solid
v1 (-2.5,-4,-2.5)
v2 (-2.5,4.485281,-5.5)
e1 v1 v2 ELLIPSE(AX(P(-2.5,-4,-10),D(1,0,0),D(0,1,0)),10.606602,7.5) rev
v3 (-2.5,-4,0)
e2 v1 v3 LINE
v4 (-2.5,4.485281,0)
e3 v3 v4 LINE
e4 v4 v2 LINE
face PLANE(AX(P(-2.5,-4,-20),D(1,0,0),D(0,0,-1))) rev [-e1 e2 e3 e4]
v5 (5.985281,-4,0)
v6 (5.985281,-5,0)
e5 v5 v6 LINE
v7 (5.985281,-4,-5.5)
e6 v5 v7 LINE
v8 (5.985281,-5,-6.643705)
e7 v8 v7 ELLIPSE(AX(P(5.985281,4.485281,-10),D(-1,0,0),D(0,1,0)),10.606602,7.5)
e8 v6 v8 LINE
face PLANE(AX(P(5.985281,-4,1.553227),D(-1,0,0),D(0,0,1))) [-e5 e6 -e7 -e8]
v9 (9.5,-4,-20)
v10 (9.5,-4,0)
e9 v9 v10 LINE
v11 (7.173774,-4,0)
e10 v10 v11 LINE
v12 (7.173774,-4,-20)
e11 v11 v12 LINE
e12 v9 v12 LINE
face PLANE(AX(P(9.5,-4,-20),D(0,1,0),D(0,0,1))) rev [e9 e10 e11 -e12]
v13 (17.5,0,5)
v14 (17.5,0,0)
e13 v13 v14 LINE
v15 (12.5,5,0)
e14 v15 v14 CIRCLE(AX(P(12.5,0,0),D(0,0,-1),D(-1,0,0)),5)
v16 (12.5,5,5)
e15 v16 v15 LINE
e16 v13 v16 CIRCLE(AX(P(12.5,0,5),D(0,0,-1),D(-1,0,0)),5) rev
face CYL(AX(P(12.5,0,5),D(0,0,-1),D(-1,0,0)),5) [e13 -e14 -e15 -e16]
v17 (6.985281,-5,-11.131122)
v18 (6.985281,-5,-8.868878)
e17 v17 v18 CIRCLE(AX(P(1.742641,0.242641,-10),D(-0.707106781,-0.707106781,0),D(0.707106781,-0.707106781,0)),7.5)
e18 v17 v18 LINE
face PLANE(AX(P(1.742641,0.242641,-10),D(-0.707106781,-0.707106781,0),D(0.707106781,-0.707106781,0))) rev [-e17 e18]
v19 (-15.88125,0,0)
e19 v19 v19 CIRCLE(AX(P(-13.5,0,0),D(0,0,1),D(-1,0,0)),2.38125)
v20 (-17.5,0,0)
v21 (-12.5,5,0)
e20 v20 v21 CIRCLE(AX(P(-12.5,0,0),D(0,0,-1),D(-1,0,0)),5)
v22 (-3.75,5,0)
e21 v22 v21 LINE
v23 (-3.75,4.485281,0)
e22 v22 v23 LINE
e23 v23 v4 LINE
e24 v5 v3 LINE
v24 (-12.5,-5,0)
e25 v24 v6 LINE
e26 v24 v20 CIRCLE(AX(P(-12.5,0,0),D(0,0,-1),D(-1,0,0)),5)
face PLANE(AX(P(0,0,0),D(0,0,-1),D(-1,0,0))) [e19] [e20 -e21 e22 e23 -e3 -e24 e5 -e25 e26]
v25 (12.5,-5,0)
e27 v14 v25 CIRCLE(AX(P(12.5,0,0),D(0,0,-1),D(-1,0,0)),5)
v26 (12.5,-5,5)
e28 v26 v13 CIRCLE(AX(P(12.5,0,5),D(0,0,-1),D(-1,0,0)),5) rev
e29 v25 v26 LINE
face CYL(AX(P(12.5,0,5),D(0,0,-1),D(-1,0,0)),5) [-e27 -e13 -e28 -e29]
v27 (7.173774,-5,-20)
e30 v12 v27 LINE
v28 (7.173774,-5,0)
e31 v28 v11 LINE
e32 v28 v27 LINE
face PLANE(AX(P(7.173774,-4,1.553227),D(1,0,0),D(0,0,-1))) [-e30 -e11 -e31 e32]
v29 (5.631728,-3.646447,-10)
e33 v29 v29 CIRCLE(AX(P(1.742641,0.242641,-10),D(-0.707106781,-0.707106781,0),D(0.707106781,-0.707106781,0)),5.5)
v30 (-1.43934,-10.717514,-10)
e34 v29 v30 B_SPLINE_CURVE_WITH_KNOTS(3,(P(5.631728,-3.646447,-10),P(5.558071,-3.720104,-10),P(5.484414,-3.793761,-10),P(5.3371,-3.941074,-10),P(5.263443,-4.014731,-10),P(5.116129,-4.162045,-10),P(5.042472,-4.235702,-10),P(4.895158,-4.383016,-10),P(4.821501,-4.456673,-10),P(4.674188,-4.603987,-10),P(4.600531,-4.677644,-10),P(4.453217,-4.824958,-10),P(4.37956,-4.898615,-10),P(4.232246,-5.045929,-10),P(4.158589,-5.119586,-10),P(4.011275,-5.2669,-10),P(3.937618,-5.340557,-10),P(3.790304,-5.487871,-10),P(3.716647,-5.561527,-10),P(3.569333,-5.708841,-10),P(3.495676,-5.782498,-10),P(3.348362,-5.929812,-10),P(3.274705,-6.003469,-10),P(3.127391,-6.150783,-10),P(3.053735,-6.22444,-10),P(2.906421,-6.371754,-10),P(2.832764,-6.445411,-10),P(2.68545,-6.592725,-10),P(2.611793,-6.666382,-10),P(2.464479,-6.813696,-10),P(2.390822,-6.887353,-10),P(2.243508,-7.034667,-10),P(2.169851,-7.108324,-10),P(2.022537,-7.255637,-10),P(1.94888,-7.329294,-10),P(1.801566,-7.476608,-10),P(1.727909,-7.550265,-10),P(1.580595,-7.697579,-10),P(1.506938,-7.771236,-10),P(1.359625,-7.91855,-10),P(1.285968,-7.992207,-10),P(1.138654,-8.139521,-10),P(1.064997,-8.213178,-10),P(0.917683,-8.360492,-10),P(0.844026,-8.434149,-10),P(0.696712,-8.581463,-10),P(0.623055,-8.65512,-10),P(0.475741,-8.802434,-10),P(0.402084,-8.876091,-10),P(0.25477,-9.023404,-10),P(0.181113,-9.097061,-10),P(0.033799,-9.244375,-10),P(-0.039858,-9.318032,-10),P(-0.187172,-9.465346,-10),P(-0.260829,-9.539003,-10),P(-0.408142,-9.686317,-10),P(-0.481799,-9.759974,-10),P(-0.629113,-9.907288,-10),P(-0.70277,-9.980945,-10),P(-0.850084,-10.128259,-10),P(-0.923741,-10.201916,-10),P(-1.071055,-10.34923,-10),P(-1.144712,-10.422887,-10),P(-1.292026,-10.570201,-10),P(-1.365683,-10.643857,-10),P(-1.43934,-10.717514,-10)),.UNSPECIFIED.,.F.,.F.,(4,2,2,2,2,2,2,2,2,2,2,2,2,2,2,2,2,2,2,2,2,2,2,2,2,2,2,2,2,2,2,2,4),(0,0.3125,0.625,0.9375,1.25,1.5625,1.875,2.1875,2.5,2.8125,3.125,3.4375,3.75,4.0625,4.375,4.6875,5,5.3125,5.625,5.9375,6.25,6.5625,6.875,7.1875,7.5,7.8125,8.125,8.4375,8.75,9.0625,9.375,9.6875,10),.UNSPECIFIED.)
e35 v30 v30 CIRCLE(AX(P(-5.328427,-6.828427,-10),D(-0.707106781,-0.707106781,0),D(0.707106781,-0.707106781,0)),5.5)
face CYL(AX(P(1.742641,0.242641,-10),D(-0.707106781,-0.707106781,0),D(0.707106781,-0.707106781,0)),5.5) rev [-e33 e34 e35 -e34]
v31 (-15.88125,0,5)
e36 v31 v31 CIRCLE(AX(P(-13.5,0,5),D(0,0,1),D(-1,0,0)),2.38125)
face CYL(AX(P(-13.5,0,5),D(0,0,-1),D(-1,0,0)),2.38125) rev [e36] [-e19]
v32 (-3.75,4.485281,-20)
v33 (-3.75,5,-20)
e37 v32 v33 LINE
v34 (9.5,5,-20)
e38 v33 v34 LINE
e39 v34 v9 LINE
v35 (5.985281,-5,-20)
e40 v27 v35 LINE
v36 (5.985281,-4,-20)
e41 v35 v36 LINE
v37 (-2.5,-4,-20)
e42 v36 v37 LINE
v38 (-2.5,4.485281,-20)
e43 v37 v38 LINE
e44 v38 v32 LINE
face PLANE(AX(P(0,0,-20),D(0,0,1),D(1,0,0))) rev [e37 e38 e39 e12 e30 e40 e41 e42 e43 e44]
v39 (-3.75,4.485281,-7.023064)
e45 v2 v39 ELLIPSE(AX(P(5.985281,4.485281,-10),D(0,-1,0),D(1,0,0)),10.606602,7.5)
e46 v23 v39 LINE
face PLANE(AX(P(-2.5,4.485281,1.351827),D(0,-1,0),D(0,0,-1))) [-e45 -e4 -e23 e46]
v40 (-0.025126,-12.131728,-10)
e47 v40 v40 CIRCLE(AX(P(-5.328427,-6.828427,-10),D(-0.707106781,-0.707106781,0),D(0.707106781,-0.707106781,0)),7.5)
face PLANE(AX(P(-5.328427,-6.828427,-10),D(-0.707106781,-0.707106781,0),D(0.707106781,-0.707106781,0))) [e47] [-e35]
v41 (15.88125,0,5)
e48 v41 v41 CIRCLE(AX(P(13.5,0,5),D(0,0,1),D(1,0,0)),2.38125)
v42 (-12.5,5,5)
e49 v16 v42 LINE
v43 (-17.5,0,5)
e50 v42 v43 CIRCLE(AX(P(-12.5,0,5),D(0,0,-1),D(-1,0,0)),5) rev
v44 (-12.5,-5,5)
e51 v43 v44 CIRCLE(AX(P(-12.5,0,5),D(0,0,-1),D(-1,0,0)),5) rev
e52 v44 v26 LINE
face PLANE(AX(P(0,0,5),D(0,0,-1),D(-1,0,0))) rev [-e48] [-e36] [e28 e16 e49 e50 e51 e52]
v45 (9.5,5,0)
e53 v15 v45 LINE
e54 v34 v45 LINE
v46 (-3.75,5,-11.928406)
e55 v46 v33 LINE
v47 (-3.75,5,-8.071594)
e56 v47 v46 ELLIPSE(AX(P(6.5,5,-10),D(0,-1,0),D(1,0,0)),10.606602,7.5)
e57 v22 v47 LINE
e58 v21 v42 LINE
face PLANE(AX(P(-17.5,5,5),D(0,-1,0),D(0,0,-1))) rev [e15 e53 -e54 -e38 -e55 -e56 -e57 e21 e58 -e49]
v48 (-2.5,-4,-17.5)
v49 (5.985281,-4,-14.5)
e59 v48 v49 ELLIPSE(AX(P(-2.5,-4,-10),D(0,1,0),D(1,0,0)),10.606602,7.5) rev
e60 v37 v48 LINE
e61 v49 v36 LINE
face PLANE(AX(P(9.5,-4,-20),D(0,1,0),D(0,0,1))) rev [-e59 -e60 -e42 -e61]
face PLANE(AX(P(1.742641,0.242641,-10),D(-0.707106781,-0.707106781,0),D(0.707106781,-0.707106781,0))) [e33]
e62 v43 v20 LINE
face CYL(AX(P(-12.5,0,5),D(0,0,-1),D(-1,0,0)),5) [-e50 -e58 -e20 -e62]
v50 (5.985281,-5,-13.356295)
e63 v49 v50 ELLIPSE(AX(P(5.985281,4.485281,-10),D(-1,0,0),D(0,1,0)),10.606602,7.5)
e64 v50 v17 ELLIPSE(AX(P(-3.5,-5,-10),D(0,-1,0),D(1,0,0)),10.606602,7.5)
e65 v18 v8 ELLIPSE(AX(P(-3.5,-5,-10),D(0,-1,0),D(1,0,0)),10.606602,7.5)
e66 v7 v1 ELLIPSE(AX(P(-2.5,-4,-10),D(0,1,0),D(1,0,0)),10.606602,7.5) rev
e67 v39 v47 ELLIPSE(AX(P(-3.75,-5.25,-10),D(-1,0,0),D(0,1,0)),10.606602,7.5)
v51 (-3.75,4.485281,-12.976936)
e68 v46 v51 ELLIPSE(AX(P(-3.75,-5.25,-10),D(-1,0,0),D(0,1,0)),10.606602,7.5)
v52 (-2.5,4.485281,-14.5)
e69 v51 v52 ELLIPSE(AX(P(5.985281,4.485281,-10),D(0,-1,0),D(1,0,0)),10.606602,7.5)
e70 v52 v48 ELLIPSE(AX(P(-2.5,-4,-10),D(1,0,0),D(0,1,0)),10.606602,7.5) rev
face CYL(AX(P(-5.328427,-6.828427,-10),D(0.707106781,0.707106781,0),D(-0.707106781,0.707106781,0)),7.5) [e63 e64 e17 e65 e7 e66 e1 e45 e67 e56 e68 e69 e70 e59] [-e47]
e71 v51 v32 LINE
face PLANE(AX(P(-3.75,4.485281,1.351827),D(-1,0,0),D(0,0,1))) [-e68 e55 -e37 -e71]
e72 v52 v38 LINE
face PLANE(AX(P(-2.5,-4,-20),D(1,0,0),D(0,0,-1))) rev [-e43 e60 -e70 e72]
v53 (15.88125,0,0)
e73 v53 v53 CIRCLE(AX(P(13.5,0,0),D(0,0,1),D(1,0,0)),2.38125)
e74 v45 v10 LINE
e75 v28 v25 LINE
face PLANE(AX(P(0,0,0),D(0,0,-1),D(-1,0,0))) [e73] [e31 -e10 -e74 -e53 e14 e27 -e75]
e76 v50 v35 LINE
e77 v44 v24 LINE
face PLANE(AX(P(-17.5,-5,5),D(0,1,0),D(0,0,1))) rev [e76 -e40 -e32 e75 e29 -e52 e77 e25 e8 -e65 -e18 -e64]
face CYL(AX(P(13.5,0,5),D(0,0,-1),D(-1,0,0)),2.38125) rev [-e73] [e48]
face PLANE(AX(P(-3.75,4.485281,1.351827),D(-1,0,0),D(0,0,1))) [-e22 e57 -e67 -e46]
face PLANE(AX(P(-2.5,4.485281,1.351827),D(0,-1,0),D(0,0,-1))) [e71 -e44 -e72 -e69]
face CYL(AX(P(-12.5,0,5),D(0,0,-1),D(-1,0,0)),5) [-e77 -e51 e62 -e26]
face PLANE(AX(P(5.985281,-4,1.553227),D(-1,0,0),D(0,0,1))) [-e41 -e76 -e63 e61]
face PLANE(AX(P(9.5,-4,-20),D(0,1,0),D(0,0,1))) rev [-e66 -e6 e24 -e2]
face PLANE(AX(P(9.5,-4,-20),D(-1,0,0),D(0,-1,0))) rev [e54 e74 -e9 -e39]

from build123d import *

# Parameters (mm, degrees)
SKETCH1_W           = 35
SKETCH1_H           = 10
SKETCH1_R           = 2.38125
BOSS_EXTRUDE1_DEPTH = 5
BOSS_EXTRUDE2_DEPTH = 20
SKETCH3_R           = 5.5
CUT_EXTRUDE1_DEPTH  = 6
BOSS_EXTRUDE3_START = 10
SKETCH4_R           = 7.5
SKETCH4_R_2         = 5.5
BOSS_EXTRUDE3_DEPTH = 10
FILLET1_R           = 5
BOSS_EXTRUDE4_START = -20
SKETCH5_W           = 1.25
SKETCH5_H           = 0.514718626
BOSS_EXTRUDE4_DEPTH = 20
SKETCH6_W           = 6.624212501
SKETCH6_H           = 0.612418682
CUT_EXTRUDE2_DEPTH  = 33.839440066
BOSS_EXTRUDE5_START = -20
SKETCH7_W           = 1.18849251
SKETCH7_H           = 1
BOSS_EXTRUDE5_DEPTH = 20


with BuildPart() as part:
    # Sketch1 → Boss-Extrude1 (new body)
    with BuildSketch(Plane.XY):
        Rectangle(SKETCH1_W, SKETCH1_H)
        with Locations((13.5, 0)):
            Circle(SKETCH1_R, mode=Mode.SUBTRACT)
        with Locations(Location((-13.5, 0, 0), (0, 0, 180))):
            Circle(SKETCH1_R, mode=Mode.SUBTRACT)
    extrude(amount=BOSS_EXTRUDE1_DEPTH)

    # Sketch2 → Boss-Extrude2 (add)
    with BuildSketch(Plane(origin=(0, 0, 0), x_dir=(-1, 0, 0), z_dir=(0, 0, -1))):
        Polygon((-9.5, -4), (2.5, -4), (2.5, 4), (2.5, 5), (-9.5, 5), (-9.5, 4), align=None)
    extrude(amount=BOSS_EXTRUDE2_DEPTH)

    # Sketch3 → Cut-Extrude1 (cut)
    with BuildSketch(Plane(origin=(-3.25, -3.25, 0), x_dir=(0, 0, 1), z_dir=(-0.7071067811865488, -0.7071067811865464, 0))):
        with Locations(Location((-10, -1.060660172, 0), (0, 0, 270))):
            Circle(SKETCH3_R)
    extrude(amount=-CUT_EXTRUDE1_DEPTH, mode=Mode.SUBTRACT)

    # Sketch4 → Boss-Extrude3 (add)
    with BuildSketch(Plane(origin=(0.992640687, 0.992640687, 0), x_dir=(0, 0, 1), z_dir=(-0.7071067811865488, -0.7071067811865462, 0)).offset(BOSS_EXTRUDE3_START)):
        with Locations(Location((-10, -1.060660172, 0), (0, 0, 53.130102354))):
            Circle(SKETCH4_R)
        with Locations(Location((-10, -1.060660172, 0), (0, 0, 270))):
            Circle(SKETCH4_R_2, mode=Mode.SUBTRACT)
    extrude(amount=-BOSS_EXTRUDE3_DEPTH)

    # Fillet1
    fillet1_edges = [part.edges().sort_by_distance(p)[0] for p in [
        (17.5, 5, 2.5),
        (17.5, -5, 2.5),
        (-17.5, -5, 2.5),
        (-17.5, 5, 2.5),
    ]]
    fillet(fillet1_edges, radius=FILLET1_R - 0.0001)  # a hair under: the kernel refuses the full size

    # Sketch5 → Boss-Extrude4 (add)
    with BuildSketch(Plane(origin=(0, 0, -20), x_dir=(-1, 0, 0), z_dir=(0, 0, -1)).offset(BOSS_EXTRUDE4_START)):
        with Locations((3.125, 4.742640687)):
            Rectangle(SKETCH5_W, SKETCH5_H)
    extrude(amount=BOSS_EXTRUDE4_DEPTH)

    # Sketch6 → Cut-Extrude2 (cut, through all)
    with BuildSketch(Plane(origin=(0, 0, -20), x_dir=(-1, 0, 0), z_dir=(0, 0, -1))):
        with Locations((6.326824877, 5.306209341)):
            Rectangle(SKETCH6_W, SKETCH6_H)
    extrude(amount=-CUT_EXTRUDE2_DEPTH, mode=Mode.SUBTRACT)

    # Sketch7 → Boss-Extrude5 (add)
    with BuildSketch(Plane(origin=(0, 0, -20), x_dir=(-1, 0, 0), z_dir=(0, 0, -1)).offset(BOSS_EXTRUDE5_START)):
        with Locations((-6.579527629, -4.5)):
            Rectangle(SKETCH7_W, SKETCH7_H)
    extrude(amount=BOSS_EXTRUDE5_DEPTH)


solid = part.part
